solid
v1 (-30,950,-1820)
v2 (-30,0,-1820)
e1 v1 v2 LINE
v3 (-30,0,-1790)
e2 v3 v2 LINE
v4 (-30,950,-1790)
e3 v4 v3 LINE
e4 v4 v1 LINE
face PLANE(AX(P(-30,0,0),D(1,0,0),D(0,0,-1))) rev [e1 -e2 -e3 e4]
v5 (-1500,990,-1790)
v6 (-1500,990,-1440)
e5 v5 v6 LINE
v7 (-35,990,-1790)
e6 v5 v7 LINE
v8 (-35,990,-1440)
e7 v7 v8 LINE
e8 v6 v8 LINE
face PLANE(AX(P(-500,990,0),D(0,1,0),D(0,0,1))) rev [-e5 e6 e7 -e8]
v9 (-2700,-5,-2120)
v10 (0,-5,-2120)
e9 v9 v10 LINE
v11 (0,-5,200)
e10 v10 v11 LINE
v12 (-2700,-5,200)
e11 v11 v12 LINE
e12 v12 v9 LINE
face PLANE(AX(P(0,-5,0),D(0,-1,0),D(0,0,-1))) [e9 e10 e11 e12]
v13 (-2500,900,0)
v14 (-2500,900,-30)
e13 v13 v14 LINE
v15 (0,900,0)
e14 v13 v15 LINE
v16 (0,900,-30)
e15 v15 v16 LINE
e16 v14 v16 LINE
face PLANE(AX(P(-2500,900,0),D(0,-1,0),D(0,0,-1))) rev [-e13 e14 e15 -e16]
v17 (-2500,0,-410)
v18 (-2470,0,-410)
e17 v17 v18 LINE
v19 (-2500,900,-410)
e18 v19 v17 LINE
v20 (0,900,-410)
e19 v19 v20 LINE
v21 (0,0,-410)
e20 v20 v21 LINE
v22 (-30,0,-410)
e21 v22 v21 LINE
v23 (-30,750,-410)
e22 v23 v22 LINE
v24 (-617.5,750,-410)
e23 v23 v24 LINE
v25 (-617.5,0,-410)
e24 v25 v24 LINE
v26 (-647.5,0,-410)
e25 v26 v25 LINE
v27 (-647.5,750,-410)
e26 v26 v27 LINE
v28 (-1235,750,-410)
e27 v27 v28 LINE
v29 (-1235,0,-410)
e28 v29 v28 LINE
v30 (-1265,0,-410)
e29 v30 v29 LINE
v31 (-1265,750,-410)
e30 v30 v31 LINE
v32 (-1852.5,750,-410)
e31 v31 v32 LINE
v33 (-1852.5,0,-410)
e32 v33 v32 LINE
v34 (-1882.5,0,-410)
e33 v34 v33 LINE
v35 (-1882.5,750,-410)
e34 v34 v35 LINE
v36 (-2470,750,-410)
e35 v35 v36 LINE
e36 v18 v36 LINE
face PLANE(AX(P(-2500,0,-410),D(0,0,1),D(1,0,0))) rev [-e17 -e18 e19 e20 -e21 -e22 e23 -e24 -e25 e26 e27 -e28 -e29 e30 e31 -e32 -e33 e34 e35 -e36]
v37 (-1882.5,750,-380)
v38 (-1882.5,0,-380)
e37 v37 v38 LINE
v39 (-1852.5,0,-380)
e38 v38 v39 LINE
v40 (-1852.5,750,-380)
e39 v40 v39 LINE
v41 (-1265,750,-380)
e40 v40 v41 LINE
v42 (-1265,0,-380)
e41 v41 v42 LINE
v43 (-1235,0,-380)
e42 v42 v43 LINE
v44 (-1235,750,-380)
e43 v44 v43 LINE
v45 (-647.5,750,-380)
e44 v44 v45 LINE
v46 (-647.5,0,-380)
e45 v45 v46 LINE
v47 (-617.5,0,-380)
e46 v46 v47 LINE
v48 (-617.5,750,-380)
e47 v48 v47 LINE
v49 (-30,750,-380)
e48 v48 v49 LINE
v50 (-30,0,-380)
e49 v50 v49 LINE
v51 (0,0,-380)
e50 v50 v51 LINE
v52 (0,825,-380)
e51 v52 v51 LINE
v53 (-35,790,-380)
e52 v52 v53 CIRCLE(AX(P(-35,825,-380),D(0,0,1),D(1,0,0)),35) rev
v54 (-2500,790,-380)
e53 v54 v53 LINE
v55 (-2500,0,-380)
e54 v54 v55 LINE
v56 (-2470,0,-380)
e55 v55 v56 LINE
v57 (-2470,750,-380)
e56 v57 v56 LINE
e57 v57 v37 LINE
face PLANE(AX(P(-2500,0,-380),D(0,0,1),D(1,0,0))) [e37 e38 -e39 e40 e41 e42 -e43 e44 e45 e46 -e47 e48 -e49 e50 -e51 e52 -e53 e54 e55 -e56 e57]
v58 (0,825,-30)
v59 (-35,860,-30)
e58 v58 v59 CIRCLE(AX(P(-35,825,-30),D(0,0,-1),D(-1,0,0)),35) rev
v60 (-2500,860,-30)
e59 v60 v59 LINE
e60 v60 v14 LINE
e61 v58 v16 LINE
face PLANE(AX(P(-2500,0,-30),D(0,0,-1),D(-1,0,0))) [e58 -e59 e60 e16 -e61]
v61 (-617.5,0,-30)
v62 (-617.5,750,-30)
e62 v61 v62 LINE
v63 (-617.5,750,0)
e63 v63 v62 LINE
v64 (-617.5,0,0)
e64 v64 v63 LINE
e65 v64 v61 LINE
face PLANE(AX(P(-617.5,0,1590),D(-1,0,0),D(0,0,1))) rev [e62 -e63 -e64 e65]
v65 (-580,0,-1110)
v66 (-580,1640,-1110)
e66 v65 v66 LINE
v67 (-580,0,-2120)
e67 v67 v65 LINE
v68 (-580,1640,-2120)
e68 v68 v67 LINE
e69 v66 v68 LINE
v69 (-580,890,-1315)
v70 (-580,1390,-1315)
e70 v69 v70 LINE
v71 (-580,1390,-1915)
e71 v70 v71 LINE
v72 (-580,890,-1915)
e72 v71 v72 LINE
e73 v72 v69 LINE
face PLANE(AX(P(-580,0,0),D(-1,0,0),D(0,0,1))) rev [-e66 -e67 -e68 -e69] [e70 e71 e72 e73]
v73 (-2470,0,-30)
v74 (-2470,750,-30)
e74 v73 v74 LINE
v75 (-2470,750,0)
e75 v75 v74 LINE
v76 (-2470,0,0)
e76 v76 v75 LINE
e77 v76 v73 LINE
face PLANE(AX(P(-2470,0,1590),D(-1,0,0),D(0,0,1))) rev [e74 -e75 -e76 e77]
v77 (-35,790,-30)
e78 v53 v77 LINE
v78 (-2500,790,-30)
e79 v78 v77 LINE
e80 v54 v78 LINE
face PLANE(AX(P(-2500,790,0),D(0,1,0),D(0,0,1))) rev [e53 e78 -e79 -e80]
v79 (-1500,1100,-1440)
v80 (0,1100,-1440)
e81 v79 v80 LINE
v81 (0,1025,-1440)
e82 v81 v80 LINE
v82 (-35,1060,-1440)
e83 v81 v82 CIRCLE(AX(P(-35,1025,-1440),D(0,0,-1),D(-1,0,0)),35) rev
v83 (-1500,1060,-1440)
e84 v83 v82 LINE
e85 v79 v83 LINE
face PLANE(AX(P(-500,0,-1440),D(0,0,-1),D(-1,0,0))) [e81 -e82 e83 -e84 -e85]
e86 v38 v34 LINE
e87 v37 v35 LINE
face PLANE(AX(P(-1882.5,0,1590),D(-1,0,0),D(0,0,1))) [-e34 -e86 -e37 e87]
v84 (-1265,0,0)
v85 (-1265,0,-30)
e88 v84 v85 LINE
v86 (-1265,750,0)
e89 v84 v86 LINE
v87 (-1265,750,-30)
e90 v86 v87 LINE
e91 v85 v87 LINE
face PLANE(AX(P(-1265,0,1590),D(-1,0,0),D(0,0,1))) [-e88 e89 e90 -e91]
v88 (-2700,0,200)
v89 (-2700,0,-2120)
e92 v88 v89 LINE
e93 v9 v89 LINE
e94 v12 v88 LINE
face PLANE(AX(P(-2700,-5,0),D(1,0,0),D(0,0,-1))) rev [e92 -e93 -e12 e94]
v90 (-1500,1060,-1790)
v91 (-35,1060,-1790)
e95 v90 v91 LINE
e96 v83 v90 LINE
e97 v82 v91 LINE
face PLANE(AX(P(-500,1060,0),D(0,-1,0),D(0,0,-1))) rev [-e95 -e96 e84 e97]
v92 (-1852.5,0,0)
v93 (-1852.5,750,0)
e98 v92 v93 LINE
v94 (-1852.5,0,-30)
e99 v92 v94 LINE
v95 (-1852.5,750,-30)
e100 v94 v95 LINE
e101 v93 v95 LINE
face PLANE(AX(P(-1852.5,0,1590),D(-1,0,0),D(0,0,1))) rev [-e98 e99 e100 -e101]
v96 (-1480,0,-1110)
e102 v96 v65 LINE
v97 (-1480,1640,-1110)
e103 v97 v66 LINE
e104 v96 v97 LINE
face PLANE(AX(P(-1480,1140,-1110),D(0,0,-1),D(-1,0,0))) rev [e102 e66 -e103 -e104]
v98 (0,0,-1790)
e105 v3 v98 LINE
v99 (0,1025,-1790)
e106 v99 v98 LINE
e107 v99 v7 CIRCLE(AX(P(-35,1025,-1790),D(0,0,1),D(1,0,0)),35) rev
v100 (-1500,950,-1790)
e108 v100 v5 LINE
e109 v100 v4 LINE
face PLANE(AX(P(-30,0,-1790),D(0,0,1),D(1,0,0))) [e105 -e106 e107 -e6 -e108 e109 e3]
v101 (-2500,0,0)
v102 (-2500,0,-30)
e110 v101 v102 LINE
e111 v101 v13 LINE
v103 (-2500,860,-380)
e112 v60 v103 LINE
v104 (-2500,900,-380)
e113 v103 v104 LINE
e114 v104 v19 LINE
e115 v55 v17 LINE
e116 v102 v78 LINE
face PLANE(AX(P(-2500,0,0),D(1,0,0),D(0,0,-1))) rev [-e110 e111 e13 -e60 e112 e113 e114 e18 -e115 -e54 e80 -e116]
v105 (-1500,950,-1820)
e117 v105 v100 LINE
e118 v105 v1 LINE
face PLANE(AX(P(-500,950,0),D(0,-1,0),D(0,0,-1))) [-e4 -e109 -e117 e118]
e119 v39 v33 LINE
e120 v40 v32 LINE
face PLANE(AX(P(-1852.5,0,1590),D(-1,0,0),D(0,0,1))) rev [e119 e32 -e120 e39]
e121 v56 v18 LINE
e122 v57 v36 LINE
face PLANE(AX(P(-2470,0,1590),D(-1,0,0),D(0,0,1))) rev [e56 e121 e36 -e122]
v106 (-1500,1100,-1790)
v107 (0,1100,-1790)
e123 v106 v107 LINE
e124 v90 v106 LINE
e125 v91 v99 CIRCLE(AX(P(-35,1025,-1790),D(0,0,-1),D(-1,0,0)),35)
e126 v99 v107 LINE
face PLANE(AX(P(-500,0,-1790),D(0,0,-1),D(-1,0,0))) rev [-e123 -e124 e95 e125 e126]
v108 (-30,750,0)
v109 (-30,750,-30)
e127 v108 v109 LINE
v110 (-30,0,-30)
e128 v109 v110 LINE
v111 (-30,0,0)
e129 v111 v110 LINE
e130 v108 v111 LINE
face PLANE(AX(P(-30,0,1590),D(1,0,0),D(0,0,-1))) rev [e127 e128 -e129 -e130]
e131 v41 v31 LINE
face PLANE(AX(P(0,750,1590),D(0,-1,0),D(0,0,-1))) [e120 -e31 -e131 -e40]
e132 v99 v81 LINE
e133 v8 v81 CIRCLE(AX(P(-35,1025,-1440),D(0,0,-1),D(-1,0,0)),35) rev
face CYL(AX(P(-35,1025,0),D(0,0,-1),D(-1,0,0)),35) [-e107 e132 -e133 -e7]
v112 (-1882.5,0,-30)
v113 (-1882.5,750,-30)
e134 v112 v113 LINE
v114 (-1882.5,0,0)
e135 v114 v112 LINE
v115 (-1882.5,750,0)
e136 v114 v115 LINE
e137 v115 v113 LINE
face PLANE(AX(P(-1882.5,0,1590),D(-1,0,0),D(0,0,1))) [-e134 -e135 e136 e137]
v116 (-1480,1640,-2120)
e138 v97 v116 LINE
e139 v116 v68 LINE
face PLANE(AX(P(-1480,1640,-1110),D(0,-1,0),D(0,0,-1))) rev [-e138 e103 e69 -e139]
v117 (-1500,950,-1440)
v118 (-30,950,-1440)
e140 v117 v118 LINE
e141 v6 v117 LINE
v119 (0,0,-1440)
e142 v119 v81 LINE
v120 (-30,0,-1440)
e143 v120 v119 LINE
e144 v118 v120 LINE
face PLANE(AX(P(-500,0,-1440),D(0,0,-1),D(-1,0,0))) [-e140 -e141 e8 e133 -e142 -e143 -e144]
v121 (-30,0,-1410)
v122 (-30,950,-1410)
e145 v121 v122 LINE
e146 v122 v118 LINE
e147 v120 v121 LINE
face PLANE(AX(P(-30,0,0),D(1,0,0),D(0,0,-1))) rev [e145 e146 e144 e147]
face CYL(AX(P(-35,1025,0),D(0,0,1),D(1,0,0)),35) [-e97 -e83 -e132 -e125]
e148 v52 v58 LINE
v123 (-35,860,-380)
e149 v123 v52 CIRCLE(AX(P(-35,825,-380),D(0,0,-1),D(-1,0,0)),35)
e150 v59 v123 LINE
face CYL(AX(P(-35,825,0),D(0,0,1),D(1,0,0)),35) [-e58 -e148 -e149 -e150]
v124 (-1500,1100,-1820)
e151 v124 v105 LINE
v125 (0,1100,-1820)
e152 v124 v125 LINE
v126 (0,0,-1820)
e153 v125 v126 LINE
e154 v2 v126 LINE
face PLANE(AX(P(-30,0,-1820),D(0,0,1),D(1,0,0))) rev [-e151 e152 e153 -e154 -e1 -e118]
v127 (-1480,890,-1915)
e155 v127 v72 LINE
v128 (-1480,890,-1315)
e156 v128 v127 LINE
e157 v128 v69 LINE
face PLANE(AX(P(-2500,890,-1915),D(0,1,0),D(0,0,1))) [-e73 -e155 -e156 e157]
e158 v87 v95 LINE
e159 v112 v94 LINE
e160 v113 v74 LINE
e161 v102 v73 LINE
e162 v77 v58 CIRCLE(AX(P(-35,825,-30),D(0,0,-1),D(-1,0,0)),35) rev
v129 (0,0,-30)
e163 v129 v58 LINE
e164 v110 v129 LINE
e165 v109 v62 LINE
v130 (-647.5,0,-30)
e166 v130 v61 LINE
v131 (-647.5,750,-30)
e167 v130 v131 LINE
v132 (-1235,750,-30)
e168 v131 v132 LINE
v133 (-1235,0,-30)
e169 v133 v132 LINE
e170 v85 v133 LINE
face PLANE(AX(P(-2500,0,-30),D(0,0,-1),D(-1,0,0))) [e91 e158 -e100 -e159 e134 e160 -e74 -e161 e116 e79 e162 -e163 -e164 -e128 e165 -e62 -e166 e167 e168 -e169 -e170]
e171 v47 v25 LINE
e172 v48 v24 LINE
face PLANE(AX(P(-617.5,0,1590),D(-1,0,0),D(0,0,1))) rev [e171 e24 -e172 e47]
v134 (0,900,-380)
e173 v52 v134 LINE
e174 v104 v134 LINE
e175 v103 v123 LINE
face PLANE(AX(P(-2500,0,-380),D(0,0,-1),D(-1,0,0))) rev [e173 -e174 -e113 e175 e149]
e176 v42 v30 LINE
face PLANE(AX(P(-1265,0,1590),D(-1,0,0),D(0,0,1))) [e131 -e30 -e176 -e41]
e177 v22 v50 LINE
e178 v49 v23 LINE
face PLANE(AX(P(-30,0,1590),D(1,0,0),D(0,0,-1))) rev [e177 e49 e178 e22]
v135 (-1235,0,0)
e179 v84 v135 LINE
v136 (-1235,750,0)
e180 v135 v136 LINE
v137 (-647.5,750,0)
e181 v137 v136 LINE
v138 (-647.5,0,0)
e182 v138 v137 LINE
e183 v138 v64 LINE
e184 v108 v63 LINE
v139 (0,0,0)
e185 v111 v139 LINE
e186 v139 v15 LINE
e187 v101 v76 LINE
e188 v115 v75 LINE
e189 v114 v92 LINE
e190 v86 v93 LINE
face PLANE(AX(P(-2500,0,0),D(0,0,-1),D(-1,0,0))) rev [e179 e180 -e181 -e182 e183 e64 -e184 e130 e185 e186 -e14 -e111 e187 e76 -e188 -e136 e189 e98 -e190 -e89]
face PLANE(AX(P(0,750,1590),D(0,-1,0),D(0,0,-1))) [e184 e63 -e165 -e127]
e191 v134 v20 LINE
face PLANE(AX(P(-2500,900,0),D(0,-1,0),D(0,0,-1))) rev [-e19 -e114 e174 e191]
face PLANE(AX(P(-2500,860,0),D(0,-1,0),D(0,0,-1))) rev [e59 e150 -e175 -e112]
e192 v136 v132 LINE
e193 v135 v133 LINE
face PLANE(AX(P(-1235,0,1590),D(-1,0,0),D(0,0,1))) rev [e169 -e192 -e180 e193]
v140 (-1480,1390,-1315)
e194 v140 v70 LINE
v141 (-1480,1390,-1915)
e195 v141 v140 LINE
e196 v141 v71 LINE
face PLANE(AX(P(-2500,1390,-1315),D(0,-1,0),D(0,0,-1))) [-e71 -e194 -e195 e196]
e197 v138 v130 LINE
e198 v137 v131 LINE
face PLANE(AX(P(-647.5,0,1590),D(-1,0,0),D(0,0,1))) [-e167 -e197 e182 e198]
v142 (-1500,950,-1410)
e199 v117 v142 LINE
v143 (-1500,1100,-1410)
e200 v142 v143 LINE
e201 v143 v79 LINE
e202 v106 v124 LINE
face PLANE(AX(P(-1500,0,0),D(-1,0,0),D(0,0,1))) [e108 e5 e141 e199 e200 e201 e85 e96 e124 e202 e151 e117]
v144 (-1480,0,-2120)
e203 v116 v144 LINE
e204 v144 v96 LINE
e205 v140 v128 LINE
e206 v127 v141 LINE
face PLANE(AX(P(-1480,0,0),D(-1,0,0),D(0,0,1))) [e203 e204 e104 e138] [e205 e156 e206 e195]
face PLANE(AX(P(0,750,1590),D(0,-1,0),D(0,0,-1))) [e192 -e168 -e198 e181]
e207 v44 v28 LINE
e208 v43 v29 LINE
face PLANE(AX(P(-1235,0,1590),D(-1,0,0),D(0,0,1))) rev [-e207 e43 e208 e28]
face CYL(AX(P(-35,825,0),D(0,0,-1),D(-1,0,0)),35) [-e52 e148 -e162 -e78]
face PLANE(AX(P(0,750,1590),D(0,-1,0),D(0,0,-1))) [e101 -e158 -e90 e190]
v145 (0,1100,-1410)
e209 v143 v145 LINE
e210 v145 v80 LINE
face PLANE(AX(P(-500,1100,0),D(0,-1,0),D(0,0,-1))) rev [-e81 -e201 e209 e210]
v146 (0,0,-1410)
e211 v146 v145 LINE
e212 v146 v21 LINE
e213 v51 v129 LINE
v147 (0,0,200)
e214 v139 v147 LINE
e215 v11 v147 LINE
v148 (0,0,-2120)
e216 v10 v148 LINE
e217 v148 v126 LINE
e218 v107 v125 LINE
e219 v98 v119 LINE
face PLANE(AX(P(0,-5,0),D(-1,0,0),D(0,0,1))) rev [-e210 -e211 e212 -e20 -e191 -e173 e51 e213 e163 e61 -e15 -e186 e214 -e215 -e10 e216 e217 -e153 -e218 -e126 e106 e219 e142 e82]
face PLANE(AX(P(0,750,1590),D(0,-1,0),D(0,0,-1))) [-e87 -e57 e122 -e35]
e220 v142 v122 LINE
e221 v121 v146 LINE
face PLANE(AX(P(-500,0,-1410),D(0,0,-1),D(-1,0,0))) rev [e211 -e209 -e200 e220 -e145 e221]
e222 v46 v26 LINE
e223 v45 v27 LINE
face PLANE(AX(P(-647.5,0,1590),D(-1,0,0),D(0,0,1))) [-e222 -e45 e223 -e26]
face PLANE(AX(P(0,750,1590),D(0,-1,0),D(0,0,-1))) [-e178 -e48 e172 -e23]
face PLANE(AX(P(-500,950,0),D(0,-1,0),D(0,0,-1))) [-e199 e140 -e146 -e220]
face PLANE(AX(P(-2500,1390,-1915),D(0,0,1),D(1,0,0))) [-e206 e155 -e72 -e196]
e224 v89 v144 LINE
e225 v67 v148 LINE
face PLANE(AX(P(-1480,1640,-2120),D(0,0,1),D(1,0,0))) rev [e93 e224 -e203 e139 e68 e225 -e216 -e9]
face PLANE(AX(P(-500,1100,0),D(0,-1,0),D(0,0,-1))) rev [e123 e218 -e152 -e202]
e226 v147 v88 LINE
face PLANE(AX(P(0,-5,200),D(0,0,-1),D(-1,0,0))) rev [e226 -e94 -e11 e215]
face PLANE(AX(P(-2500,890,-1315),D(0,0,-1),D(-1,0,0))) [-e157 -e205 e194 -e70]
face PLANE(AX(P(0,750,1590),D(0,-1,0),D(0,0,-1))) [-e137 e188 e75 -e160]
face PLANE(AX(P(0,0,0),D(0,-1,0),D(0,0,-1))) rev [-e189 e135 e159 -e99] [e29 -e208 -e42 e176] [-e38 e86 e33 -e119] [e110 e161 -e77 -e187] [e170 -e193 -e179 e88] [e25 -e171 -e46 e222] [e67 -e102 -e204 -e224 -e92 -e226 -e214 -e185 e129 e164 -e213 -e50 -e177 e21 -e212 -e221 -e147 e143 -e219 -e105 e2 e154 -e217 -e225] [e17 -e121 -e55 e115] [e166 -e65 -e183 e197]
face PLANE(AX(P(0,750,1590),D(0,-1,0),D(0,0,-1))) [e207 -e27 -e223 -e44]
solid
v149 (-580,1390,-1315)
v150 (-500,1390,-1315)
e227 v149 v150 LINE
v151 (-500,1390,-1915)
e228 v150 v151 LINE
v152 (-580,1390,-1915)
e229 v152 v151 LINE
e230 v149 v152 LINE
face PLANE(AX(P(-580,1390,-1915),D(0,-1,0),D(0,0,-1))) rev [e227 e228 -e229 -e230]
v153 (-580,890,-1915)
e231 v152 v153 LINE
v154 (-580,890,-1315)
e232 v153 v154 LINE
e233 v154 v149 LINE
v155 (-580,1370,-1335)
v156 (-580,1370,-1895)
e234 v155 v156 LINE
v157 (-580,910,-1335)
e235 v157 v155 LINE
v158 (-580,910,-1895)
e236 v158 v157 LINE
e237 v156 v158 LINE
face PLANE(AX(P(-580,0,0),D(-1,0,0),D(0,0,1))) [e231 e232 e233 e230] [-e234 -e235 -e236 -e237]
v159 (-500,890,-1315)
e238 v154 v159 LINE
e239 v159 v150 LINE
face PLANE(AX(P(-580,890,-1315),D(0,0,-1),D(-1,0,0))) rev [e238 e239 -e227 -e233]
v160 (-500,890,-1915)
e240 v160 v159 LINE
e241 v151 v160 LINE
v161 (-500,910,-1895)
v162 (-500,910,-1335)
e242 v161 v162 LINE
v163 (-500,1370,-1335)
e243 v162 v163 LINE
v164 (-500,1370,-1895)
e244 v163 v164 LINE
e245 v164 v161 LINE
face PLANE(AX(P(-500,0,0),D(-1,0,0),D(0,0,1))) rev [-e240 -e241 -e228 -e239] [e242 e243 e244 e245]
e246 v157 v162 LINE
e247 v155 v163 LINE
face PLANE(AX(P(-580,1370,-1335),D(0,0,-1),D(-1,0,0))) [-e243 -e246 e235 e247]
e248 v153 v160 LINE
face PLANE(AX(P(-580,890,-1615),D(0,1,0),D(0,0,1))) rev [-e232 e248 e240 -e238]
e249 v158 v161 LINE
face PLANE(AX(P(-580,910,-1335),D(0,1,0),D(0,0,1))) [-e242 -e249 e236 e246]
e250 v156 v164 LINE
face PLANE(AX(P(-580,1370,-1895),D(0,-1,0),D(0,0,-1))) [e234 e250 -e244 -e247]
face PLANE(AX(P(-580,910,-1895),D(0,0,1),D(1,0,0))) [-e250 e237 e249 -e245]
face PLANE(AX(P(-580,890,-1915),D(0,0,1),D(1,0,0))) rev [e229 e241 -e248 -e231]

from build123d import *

# Parameters (mm, degrees)
SKETCH1_W             = 30
SKETCH1_H             = 550
SKETCH1_H_2           = 400
SKETCH1_H_3           = 150
SKETCH1_H_4           = 800
BOSS_EXTRUDE5_DEPTH   = 30
BOSS_EXTRUDE6_DEPTH   = 500
BOSS_EXTRUDE7_DEPTH   = 2500
SKETCH2_W             = 560
SKETCH2_H             = 460
BOSS_EXTRUDE8_DEPTH   = 80
BOSS_EXTRUDE10_DEPTH  = 900
SKETCH6_4_OUTSIDE_W   = 2855.048
SKETCH6_4_OUTSIDE_H   = 2375.048
SKETCH6_4_OUTSIDE_W_2 = 600
SKETCH6_4_OUTSIDE_H_2 = 500
CUT_EXTRUDE2_DEPTH    = 3298.028965599
FILLET1_R             = 35
FILLET2_R             = 35
BOSS_EXTRUDE11_DEPTH  = 1000
SKETCH19_W            = 587.5
SKETCH19_H            = 750
CUT_EXTRUDE3_DEPTH    = 2000
SKETCH20_W            = 900
SKETCH20_H            = 1010
BOSS_EXTRUDE12_DEPTH  = 5


with BuildPart() as part:
    # Sketch1 → Boss-Extrude5 (new body)
    with BuildSketch(Plane(origin=(0, 0, 0), x_dir=(0, 0, -1), z_dir=(1, 0, 0))):
        with Locations((1805, 275)):
            Rectangle(SKETCH1_W, SKETCH1_H)
        with Locations((1805, 750)):
            Rectangle(SKETCH1_W, SKETCH1_H_2)
        with Locations((1425, 875)):
            Rectangle(SKETCH1_W, SKETCH1_H_3)
        with Locations((1425, 400)):
            Rectangle(SKETCH1_W, SKETCH1_H_4)
    extrude(amount=-BOSS_EXTRUDE5_DEPTH)

    # Sketch1<10> → Boss-Extrude6 (add)
    with BuildSketch(Plane(origin=(0, 0, 0), x_dir=(0, 0, -1), z_dir=(1, 0, 0))):
        Polygon((1410, 950), (1440, 950), (1440, 990), (1440, 1060), (1440, 1100), (1410, 1100), align=None)
        Polygon((1440, 1060), (1440, 990), (1615, 990), (1790, 990), (1790, 1060), (1615, 1060), align=None)
        Polygon((1790, 990), (1790, 950), (1820, 950), (1820, 1100), (1790, 1100), (1790, 1060), align=None)
    extrude(amount=-BOSS_EXTRUDE6_DEPTH)

    # Fillet1
    fillet1_edges = [part.edges().sort_by_distance(p)[0] for p in [
        (0, 1060, -1615),
        (0, 990, -1615),
    ]]
    fillet(fillet1_edges, radius=FILLET1_R - 0.0001)  # a hair under: the kernel refuses the full size

    # Sketch17 → Boss-Extrude11 (add)
    with BuildSketch(Plane.ZY.offset(500)):
        Polygon((-1615, 1060), (-1440, 1060), (-1440, 1100), (-1410, 1100), (-1410, 950), (-1440, 950), (-1440, 990), (-1790, 990), (-1790, 950), (-1820, 950), (-1820, 1100), (-1790, 1100), (-1790, 1060), align=None)
    extrude(amount=BOSS_EXTRUDE11_DEPTH)



with BuildPart() as body_2:
    # Sketch1<11> → Boss-Extrude7 (new body)
    with BuildSketch(Plane(origin=(0, 0, 0), x_dir=(0, 0, -1), z_dir=(1, 0, 0))):
        Polygon((380, 0), (410, 0), (410, 750), (380, 750), (380, 375), align=None)
        Polygon((0, 0), (30, 0), (30, 450), (30, 750), (0, 750), align=None)
        Polygon((30, 860), (30, 900), (0, 900), (0, 750), (30, 750), (30, 790), align=None)
        Polygon((205, 790), (380, 790), (380, 860), (205, 860), (30, 860), (30, 790), align=None)
        Polygon((380, 750), (410, 750), (410, 900), (380, 900), (380, 860), (380, 790), align=None)
    extrude(amount=-BOSS_EXTRUDE7_DEPTH)

    # Fillet2
    fillet2_edges = [body_2.edges().sort_by_distance(p)[0] for p in [
        (0, 790, -205),
        (0, 860, -205),
    ]]
    fillet(fillet2_edges, radius=FILLET2_R - 0.0001)  # a hair under: the kernel refuses the full size

    # Sketch19 → Cut-Extrude3 (cut)
    with BuildSketch(Plane(origin=(0, 0, -410), x_dir=(-1, 0, 0), z_dir=(0, 0, -1))):
        with Locations((323.75, 375)):
            Rectangle(SKETCH19_W, SKETCH19_H)
        with Locations((941.25, 375)):
            Rectangle(SKETCH19_W, SKETCH19_H)
        with Locations((1558.75, 375)):
            Rectangle(SKETCH19_W, SKETCH19_H)
        with Locations((2176.25, 375)):
            Rectangle(SKETCH19_W, SKETCH19_H)
    extrude(amount=-CUT_EXTRUDE3_DEPTH, mode=Mode.SUBTRACT)


with BuildPart() as body_3:
    # Sketch2 → Boss-Extrude8 (new body)
    with BuildSketch(Plane.ZY.offset(500)):
        Polygon((-1615, 890), (-1315, 890), (-1315, 1390), (-1915, 1390), (-1915, 890), align=None)
        with Locations((-1615, 1140)):
            Rectangle(SKETCH2_W, SKETCH2_H, mode=Mode.SUBTRACT)
    extrude(amount=BOSS_EXTRUDE8_DEPTH)

    # Sketch6 → Boss-Extrude10 (add)
    with BuildSketch(Plane.ZY.offset(580)):
        Polygon((-1110, 1140), (-1110, 1640), (-2120, 1640), (-2120, 0), (-1110, 0), align=None)
    extrude(amount=BOSS_EXTRUDE10_DEPTH)

    # Sketch6<4> outside → Cut-Extrude2 (cut, through all)
    # profile 1 of 2: a face of its own
    with BuildSketch(Plane.ZY.offset(580)):
        with Locations((-1060, 820)):
            Rectangle(SKETCH6_4_OUTSIDE_W, SKETCH6_4_OUTSIDE_H)
        Polygon((-1110, 1140), (-1110, 1640), (-2120, 1640), (-2120, 0), (-1110, 0), align=None, mode=Mode.SUBTRACT)
    # profile 2 of 2: a face of its own
    with BuildSketch(Plane.ZY.offset(580)):
        with Locations((-1615, 1140)):
            Rectangle(SKETCH6_4_OUTSIDE_W_2, SKETCH6_4_OUTSIDE_H_2)
    extrude(amount=CUT_EXTRUDE2_DEPTH, mode=Mode.SUBTRACT)


with BuildPart() as cut_extrude2_piece_1:
    # of the separate pieces the step leaves, piece 1, a body of its own (cut_extrude2_pieces)
    add(body_3.part.solids().sort_by_distance((-580, 1640, -1110))[0])


with BuildPart() as cut_extrude2_piece_2:
    # of the separate pieces the step leaves, piece 2, a body of its own (cut_extrude2_pieces)
    add(body_3.part.solids().sort_by_distance((-500, 890, -1315))[0])


with BuildPart() as part_1:
    add(part.part)

    add(body_2.part)  # Boss-Extrude12 merges body 2

    add(cut_extrude2_piece_1.part)  # Boss-Extrude12 merges Cut-Extrude2 piece 1
    # Sketch20 → Boss-Extrude12 (add)
    with BuildSketch(Plane.XZ):
        Polygon((0, -1820), (0, 0), (0, 200), (-2700, 200), (-2700, -2120), (-1480, -2120), (-1480, -1110), (-580, -1110), (-580, -2120), (0, -2120), align=None)
        with Locations((-1030, -1615)):
            Rectangle(SKETCH20_W, SKETCH20_H)
    extrude(amount=BOSS_EXTRUDE12_DEPTH)


solid = Compound([cut_extrude2_piece_2.part, part_1.part])
